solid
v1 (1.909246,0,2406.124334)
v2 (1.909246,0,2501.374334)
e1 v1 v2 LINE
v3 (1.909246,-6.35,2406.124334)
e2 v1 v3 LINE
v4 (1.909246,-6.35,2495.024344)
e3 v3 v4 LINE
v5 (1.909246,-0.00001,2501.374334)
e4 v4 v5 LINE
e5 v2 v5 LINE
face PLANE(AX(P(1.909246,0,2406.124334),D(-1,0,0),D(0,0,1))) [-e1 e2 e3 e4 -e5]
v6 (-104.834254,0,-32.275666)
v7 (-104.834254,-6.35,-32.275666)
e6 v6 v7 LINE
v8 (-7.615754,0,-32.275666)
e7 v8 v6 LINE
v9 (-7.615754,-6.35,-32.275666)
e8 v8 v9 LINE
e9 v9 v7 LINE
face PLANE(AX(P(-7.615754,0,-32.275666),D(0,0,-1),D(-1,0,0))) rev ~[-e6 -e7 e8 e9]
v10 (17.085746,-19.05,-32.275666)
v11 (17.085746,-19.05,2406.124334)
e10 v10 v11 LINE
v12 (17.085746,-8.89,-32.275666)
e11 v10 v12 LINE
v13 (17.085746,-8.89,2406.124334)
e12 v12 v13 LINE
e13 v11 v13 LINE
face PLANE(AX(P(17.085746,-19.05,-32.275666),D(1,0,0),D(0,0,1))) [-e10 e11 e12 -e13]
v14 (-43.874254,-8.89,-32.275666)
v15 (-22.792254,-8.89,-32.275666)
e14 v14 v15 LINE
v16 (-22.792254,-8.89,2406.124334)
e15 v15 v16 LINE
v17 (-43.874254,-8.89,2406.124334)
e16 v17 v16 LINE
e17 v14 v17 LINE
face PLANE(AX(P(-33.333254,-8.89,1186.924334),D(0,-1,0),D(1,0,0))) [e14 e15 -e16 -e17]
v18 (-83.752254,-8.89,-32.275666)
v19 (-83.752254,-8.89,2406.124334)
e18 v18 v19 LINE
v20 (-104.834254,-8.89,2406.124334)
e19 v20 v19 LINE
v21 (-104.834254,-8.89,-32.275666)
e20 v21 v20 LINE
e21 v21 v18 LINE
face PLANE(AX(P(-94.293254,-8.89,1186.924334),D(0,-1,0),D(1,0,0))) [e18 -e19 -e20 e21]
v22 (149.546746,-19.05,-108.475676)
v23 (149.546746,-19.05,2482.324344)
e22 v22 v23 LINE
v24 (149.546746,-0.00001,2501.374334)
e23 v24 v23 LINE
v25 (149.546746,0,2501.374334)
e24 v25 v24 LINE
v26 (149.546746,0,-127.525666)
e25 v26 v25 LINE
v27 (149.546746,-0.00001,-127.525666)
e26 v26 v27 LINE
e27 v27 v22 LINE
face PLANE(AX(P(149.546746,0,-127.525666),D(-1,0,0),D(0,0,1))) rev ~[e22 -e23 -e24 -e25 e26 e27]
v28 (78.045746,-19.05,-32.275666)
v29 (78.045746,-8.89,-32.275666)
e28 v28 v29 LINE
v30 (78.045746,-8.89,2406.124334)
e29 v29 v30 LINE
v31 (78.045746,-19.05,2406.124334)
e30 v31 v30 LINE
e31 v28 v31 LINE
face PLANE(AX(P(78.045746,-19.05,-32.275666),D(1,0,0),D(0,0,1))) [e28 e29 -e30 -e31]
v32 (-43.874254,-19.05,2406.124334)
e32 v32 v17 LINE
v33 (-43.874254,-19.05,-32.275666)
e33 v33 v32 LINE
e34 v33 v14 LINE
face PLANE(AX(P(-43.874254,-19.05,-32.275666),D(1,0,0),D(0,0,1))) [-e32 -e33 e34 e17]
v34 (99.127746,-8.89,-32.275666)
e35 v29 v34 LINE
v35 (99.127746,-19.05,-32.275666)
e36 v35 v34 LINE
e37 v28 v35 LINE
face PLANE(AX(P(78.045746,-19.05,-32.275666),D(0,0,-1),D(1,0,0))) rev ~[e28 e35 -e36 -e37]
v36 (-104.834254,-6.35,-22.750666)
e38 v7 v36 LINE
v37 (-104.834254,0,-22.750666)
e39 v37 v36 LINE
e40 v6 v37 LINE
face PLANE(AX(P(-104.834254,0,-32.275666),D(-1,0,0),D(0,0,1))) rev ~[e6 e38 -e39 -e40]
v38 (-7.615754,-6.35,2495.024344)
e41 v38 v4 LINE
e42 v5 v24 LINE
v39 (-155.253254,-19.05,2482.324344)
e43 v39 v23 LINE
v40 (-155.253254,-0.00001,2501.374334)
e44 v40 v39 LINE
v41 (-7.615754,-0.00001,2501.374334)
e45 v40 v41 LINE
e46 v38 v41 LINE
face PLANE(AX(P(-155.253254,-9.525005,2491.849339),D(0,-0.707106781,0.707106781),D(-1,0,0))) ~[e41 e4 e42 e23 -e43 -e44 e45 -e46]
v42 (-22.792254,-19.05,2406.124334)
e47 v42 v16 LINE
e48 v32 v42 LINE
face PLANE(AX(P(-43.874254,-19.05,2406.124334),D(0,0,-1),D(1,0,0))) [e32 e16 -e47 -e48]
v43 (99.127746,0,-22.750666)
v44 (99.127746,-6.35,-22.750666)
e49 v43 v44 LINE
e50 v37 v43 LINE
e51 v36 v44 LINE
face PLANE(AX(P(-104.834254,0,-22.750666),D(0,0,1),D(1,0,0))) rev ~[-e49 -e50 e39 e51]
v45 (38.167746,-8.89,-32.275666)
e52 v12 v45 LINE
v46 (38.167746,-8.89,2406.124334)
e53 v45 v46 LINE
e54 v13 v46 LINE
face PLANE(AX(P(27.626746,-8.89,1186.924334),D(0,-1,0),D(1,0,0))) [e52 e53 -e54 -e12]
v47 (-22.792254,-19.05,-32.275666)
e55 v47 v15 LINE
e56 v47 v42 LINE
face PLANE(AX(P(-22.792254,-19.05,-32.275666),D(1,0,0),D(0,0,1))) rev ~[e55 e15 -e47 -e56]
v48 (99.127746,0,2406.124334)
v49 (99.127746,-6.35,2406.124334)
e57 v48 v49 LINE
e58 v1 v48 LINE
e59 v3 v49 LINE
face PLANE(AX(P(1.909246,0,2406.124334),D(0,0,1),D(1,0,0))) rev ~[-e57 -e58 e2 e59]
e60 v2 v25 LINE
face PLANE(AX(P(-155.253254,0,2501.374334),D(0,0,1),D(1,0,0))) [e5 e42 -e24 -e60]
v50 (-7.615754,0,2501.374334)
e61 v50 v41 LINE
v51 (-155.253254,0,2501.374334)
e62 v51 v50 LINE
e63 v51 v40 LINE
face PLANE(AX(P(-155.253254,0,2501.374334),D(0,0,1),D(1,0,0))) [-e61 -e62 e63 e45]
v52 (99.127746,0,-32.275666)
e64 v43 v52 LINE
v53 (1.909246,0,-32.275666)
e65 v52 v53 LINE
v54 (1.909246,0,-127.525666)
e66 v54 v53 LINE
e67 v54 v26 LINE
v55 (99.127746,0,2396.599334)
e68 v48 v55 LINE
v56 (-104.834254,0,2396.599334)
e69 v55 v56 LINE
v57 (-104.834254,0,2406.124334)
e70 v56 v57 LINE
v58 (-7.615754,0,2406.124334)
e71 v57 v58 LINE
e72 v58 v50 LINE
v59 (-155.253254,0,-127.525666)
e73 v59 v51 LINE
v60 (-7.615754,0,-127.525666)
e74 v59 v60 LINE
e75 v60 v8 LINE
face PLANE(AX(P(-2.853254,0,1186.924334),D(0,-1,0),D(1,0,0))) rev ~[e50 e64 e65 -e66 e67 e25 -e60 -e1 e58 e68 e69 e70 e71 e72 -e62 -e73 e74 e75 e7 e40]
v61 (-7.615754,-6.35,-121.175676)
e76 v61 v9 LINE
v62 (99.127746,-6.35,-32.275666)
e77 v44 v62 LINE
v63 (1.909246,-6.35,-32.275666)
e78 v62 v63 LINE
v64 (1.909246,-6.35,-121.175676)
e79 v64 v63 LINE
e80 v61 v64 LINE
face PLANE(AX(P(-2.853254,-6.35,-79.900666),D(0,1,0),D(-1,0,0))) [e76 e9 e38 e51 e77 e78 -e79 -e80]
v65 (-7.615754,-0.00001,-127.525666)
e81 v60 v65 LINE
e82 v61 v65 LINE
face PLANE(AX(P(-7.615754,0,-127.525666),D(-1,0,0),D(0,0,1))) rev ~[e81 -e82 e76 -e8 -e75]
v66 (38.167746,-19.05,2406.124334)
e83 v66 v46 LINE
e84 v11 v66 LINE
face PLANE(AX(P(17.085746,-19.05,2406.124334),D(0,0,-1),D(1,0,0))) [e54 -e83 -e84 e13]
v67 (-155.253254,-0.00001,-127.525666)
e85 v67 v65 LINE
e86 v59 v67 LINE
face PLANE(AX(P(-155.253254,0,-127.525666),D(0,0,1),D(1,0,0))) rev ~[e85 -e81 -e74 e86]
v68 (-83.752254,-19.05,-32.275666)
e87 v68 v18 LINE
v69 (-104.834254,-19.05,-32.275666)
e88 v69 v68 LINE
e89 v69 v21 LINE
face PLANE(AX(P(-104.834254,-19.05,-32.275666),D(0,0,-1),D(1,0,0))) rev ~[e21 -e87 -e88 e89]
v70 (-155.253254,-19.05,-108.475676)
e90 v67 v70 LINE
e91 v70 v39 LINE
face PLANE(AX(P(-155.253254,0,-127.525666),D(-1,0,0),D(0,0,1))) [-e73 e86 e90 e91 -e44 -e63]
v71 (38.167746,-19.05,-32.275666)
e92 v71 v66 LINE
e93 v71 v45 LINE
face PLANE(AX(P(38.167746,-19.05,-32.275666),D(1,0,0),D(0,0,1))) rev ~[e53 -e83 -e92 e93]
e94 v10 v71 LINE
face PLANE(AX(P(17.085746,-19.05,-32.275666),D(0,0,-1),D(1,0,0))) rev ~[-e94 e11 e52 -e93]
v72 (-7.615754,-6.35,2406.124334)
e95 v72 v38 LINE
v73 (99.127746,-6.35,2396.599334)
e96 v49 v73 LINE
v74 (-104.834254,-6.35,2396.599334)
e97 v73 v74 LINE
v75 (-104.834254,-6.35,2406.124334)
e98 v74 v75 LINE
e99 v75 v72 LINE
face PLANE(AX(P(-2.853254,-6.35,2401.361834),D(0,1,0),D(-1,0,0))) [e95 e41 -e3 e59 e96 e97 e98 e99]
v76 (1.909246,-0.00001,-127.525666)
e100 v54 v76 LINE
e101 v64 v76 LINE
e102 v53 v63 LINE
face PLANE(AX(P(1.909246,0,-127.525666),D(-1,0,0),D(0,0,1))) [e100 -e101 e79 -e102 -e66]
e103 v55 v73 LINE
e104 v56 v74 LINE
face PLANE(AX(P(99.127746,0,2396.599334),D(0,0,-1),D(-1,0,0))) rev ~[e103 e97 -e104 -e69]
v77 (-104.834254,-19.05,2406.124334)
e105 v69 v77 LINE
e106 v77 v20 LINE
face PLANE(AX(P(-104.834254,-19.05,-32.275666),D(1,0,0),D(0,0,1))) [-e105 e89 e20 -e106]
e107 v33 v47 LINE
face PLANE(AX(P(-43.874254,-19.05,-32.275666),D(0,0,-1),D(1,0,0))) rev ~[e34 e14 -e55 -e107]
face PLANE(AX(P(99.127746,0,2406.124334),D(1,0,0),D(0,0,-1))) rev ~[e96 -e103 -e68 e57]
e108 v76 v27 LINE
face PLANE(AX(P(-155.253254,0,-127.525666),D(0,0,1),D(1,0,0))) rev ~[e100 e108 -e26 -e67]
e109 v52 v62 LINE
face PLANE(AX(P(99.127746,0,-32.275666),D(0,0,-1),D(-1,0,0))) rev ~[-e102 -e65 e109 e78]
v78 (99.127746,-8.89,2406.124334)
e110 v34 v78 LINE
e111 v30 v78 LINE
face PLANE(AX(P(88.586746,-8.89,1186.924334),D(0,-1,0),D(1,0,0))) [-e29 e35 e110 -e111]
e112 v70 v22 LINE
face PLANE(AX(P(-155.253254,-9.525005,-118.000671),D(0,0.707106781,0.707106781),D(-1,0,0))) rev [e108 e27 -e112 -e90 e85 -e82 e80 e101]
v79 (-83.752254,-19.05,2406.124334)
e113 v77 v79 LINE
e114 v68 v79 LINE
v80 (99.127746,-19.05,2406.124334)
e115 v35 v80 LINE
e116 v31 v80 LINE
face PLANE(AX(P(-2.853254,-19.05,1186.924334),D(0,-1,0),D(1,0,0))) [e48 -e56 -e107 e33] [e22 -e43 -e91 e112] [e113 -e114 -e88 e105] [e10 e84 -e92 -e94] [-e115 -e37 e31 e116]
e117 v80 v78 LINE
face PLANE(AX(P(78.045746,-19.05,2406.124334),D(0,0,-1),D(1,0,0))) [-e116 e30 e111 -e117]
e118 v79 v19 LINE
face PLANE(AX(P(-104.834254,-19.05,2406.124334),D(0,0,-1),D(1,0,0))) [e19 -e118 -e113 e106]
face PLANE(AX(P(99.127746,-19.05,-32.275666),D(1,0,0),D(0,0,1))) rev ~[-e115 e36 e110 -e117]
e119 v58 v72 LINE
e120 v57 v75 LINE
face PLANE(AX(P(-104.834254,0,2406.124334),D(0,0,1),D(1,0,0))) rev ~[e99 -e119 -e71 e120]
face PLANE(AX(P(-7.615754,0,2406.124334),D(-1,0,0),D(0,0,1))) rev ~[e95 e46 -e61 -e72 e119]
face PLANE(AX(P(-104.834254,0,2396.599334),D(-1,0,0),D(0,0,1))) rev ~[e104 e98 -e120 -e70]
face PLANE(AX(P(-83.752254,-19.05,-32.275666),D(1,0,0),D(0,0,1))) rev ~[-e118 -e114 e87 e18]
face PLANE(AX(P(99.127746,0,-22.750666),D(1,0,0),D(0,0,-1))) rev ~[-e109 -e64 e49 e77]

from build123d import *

# Parameters (mm, degrees)
F0_W     = 304.8
F0_H     = 2628.9
F1_DEPTH = 19.05
F2_SIZE  = 19.04999
F3_W     = 21.082
F3_H     = 2438.4
F4_DEPTH = 10.16
F5_W     = 9.525
F5_H     = 95.25
F6_DEPTH = 6.35


# Not quite as in the source:
# - a fillet or chamfer is up to 0.001 mm smaller than in the source, because OpenCascade refuses the exact size


with BuildPart() as f1:
    # F0 (on Front) → F1 (new body)
    with BuildSketch(Plane.XZ):
        with Locations((-2.8532538563, 1186.9243339048)):
            Rectangle(F0_W, F0_H)
    extrude(amount=F1_DEPTH)

    # F2 (size 19.05 in the source; OpenCascade refuses exactly that, so slightly less here)
    f2_edges = [f1.edges().sort_by_distance(p)[0] for p in [
        (-2.853254, -19.05, 2501.374334),
        (-2.853254, -19.05, -127.525666),
    ]]
    chamfer(f2_edges, length=F2_SIZE)

    # F3 (on face) → F4 (cut)
    with BuildSketch(Plane.XZ.offset(19.05)):
        with Locations((-94.2932538563, 1186.9243339048)):
            Rectangle(F3_W, F3_H)
        with Locations((-33.3332538563, 1186.9243339048)):
            Rectangle(F3_W, F3_H)
        with Locations((27.6267461437, 1186.9243339048)):
            Rectangle(F3_W, F3_H)
        with Locations((88.5867461437, 1186.9243339048)):
            Rectangle(F3_W, F3_H)
    extrude(amount=-F4_DEPTH, mode=Mode.SUBTRACT)

    # F5 (on face) → F6 (cut)
    with BuildSketch(Plane(origin=(0, 0, 0), x_dir=(-1, 0, 0), z_dir=(0, 1, 0))):
        Polygon((-1.9092461437, 2406.1243339048), (-99.1277461437, 2406.1243339048), (-99.1277461437, 2396.5993339048), (104.8342538563, 2396.5993339048), (104.8342538563, 2406.1243339048), (7.6157538563, 2406.1243339048), align=None)
        with Locations((2.8532538563, 2453.7493339048)):
            Rectangle(F5_W, F5_H)
        with Locations((2.8532538563, -79.9006660952)):
            Rectangle(F5_W, F5_H)
        Polygon((-99.1277461437, -32.2756660952), (-1.9092461437, -32.2756660952), (7.6157538563, -32.2756660952), (104.8342538563, -32.2756660952), (104.8342538563, -22.7506660952), (-99.1277461437, -22.7506660952), align=None)
    extrude(amount=-F6_DEPTH, mode=Mode.SUBTRACT)


solid = f1.part
